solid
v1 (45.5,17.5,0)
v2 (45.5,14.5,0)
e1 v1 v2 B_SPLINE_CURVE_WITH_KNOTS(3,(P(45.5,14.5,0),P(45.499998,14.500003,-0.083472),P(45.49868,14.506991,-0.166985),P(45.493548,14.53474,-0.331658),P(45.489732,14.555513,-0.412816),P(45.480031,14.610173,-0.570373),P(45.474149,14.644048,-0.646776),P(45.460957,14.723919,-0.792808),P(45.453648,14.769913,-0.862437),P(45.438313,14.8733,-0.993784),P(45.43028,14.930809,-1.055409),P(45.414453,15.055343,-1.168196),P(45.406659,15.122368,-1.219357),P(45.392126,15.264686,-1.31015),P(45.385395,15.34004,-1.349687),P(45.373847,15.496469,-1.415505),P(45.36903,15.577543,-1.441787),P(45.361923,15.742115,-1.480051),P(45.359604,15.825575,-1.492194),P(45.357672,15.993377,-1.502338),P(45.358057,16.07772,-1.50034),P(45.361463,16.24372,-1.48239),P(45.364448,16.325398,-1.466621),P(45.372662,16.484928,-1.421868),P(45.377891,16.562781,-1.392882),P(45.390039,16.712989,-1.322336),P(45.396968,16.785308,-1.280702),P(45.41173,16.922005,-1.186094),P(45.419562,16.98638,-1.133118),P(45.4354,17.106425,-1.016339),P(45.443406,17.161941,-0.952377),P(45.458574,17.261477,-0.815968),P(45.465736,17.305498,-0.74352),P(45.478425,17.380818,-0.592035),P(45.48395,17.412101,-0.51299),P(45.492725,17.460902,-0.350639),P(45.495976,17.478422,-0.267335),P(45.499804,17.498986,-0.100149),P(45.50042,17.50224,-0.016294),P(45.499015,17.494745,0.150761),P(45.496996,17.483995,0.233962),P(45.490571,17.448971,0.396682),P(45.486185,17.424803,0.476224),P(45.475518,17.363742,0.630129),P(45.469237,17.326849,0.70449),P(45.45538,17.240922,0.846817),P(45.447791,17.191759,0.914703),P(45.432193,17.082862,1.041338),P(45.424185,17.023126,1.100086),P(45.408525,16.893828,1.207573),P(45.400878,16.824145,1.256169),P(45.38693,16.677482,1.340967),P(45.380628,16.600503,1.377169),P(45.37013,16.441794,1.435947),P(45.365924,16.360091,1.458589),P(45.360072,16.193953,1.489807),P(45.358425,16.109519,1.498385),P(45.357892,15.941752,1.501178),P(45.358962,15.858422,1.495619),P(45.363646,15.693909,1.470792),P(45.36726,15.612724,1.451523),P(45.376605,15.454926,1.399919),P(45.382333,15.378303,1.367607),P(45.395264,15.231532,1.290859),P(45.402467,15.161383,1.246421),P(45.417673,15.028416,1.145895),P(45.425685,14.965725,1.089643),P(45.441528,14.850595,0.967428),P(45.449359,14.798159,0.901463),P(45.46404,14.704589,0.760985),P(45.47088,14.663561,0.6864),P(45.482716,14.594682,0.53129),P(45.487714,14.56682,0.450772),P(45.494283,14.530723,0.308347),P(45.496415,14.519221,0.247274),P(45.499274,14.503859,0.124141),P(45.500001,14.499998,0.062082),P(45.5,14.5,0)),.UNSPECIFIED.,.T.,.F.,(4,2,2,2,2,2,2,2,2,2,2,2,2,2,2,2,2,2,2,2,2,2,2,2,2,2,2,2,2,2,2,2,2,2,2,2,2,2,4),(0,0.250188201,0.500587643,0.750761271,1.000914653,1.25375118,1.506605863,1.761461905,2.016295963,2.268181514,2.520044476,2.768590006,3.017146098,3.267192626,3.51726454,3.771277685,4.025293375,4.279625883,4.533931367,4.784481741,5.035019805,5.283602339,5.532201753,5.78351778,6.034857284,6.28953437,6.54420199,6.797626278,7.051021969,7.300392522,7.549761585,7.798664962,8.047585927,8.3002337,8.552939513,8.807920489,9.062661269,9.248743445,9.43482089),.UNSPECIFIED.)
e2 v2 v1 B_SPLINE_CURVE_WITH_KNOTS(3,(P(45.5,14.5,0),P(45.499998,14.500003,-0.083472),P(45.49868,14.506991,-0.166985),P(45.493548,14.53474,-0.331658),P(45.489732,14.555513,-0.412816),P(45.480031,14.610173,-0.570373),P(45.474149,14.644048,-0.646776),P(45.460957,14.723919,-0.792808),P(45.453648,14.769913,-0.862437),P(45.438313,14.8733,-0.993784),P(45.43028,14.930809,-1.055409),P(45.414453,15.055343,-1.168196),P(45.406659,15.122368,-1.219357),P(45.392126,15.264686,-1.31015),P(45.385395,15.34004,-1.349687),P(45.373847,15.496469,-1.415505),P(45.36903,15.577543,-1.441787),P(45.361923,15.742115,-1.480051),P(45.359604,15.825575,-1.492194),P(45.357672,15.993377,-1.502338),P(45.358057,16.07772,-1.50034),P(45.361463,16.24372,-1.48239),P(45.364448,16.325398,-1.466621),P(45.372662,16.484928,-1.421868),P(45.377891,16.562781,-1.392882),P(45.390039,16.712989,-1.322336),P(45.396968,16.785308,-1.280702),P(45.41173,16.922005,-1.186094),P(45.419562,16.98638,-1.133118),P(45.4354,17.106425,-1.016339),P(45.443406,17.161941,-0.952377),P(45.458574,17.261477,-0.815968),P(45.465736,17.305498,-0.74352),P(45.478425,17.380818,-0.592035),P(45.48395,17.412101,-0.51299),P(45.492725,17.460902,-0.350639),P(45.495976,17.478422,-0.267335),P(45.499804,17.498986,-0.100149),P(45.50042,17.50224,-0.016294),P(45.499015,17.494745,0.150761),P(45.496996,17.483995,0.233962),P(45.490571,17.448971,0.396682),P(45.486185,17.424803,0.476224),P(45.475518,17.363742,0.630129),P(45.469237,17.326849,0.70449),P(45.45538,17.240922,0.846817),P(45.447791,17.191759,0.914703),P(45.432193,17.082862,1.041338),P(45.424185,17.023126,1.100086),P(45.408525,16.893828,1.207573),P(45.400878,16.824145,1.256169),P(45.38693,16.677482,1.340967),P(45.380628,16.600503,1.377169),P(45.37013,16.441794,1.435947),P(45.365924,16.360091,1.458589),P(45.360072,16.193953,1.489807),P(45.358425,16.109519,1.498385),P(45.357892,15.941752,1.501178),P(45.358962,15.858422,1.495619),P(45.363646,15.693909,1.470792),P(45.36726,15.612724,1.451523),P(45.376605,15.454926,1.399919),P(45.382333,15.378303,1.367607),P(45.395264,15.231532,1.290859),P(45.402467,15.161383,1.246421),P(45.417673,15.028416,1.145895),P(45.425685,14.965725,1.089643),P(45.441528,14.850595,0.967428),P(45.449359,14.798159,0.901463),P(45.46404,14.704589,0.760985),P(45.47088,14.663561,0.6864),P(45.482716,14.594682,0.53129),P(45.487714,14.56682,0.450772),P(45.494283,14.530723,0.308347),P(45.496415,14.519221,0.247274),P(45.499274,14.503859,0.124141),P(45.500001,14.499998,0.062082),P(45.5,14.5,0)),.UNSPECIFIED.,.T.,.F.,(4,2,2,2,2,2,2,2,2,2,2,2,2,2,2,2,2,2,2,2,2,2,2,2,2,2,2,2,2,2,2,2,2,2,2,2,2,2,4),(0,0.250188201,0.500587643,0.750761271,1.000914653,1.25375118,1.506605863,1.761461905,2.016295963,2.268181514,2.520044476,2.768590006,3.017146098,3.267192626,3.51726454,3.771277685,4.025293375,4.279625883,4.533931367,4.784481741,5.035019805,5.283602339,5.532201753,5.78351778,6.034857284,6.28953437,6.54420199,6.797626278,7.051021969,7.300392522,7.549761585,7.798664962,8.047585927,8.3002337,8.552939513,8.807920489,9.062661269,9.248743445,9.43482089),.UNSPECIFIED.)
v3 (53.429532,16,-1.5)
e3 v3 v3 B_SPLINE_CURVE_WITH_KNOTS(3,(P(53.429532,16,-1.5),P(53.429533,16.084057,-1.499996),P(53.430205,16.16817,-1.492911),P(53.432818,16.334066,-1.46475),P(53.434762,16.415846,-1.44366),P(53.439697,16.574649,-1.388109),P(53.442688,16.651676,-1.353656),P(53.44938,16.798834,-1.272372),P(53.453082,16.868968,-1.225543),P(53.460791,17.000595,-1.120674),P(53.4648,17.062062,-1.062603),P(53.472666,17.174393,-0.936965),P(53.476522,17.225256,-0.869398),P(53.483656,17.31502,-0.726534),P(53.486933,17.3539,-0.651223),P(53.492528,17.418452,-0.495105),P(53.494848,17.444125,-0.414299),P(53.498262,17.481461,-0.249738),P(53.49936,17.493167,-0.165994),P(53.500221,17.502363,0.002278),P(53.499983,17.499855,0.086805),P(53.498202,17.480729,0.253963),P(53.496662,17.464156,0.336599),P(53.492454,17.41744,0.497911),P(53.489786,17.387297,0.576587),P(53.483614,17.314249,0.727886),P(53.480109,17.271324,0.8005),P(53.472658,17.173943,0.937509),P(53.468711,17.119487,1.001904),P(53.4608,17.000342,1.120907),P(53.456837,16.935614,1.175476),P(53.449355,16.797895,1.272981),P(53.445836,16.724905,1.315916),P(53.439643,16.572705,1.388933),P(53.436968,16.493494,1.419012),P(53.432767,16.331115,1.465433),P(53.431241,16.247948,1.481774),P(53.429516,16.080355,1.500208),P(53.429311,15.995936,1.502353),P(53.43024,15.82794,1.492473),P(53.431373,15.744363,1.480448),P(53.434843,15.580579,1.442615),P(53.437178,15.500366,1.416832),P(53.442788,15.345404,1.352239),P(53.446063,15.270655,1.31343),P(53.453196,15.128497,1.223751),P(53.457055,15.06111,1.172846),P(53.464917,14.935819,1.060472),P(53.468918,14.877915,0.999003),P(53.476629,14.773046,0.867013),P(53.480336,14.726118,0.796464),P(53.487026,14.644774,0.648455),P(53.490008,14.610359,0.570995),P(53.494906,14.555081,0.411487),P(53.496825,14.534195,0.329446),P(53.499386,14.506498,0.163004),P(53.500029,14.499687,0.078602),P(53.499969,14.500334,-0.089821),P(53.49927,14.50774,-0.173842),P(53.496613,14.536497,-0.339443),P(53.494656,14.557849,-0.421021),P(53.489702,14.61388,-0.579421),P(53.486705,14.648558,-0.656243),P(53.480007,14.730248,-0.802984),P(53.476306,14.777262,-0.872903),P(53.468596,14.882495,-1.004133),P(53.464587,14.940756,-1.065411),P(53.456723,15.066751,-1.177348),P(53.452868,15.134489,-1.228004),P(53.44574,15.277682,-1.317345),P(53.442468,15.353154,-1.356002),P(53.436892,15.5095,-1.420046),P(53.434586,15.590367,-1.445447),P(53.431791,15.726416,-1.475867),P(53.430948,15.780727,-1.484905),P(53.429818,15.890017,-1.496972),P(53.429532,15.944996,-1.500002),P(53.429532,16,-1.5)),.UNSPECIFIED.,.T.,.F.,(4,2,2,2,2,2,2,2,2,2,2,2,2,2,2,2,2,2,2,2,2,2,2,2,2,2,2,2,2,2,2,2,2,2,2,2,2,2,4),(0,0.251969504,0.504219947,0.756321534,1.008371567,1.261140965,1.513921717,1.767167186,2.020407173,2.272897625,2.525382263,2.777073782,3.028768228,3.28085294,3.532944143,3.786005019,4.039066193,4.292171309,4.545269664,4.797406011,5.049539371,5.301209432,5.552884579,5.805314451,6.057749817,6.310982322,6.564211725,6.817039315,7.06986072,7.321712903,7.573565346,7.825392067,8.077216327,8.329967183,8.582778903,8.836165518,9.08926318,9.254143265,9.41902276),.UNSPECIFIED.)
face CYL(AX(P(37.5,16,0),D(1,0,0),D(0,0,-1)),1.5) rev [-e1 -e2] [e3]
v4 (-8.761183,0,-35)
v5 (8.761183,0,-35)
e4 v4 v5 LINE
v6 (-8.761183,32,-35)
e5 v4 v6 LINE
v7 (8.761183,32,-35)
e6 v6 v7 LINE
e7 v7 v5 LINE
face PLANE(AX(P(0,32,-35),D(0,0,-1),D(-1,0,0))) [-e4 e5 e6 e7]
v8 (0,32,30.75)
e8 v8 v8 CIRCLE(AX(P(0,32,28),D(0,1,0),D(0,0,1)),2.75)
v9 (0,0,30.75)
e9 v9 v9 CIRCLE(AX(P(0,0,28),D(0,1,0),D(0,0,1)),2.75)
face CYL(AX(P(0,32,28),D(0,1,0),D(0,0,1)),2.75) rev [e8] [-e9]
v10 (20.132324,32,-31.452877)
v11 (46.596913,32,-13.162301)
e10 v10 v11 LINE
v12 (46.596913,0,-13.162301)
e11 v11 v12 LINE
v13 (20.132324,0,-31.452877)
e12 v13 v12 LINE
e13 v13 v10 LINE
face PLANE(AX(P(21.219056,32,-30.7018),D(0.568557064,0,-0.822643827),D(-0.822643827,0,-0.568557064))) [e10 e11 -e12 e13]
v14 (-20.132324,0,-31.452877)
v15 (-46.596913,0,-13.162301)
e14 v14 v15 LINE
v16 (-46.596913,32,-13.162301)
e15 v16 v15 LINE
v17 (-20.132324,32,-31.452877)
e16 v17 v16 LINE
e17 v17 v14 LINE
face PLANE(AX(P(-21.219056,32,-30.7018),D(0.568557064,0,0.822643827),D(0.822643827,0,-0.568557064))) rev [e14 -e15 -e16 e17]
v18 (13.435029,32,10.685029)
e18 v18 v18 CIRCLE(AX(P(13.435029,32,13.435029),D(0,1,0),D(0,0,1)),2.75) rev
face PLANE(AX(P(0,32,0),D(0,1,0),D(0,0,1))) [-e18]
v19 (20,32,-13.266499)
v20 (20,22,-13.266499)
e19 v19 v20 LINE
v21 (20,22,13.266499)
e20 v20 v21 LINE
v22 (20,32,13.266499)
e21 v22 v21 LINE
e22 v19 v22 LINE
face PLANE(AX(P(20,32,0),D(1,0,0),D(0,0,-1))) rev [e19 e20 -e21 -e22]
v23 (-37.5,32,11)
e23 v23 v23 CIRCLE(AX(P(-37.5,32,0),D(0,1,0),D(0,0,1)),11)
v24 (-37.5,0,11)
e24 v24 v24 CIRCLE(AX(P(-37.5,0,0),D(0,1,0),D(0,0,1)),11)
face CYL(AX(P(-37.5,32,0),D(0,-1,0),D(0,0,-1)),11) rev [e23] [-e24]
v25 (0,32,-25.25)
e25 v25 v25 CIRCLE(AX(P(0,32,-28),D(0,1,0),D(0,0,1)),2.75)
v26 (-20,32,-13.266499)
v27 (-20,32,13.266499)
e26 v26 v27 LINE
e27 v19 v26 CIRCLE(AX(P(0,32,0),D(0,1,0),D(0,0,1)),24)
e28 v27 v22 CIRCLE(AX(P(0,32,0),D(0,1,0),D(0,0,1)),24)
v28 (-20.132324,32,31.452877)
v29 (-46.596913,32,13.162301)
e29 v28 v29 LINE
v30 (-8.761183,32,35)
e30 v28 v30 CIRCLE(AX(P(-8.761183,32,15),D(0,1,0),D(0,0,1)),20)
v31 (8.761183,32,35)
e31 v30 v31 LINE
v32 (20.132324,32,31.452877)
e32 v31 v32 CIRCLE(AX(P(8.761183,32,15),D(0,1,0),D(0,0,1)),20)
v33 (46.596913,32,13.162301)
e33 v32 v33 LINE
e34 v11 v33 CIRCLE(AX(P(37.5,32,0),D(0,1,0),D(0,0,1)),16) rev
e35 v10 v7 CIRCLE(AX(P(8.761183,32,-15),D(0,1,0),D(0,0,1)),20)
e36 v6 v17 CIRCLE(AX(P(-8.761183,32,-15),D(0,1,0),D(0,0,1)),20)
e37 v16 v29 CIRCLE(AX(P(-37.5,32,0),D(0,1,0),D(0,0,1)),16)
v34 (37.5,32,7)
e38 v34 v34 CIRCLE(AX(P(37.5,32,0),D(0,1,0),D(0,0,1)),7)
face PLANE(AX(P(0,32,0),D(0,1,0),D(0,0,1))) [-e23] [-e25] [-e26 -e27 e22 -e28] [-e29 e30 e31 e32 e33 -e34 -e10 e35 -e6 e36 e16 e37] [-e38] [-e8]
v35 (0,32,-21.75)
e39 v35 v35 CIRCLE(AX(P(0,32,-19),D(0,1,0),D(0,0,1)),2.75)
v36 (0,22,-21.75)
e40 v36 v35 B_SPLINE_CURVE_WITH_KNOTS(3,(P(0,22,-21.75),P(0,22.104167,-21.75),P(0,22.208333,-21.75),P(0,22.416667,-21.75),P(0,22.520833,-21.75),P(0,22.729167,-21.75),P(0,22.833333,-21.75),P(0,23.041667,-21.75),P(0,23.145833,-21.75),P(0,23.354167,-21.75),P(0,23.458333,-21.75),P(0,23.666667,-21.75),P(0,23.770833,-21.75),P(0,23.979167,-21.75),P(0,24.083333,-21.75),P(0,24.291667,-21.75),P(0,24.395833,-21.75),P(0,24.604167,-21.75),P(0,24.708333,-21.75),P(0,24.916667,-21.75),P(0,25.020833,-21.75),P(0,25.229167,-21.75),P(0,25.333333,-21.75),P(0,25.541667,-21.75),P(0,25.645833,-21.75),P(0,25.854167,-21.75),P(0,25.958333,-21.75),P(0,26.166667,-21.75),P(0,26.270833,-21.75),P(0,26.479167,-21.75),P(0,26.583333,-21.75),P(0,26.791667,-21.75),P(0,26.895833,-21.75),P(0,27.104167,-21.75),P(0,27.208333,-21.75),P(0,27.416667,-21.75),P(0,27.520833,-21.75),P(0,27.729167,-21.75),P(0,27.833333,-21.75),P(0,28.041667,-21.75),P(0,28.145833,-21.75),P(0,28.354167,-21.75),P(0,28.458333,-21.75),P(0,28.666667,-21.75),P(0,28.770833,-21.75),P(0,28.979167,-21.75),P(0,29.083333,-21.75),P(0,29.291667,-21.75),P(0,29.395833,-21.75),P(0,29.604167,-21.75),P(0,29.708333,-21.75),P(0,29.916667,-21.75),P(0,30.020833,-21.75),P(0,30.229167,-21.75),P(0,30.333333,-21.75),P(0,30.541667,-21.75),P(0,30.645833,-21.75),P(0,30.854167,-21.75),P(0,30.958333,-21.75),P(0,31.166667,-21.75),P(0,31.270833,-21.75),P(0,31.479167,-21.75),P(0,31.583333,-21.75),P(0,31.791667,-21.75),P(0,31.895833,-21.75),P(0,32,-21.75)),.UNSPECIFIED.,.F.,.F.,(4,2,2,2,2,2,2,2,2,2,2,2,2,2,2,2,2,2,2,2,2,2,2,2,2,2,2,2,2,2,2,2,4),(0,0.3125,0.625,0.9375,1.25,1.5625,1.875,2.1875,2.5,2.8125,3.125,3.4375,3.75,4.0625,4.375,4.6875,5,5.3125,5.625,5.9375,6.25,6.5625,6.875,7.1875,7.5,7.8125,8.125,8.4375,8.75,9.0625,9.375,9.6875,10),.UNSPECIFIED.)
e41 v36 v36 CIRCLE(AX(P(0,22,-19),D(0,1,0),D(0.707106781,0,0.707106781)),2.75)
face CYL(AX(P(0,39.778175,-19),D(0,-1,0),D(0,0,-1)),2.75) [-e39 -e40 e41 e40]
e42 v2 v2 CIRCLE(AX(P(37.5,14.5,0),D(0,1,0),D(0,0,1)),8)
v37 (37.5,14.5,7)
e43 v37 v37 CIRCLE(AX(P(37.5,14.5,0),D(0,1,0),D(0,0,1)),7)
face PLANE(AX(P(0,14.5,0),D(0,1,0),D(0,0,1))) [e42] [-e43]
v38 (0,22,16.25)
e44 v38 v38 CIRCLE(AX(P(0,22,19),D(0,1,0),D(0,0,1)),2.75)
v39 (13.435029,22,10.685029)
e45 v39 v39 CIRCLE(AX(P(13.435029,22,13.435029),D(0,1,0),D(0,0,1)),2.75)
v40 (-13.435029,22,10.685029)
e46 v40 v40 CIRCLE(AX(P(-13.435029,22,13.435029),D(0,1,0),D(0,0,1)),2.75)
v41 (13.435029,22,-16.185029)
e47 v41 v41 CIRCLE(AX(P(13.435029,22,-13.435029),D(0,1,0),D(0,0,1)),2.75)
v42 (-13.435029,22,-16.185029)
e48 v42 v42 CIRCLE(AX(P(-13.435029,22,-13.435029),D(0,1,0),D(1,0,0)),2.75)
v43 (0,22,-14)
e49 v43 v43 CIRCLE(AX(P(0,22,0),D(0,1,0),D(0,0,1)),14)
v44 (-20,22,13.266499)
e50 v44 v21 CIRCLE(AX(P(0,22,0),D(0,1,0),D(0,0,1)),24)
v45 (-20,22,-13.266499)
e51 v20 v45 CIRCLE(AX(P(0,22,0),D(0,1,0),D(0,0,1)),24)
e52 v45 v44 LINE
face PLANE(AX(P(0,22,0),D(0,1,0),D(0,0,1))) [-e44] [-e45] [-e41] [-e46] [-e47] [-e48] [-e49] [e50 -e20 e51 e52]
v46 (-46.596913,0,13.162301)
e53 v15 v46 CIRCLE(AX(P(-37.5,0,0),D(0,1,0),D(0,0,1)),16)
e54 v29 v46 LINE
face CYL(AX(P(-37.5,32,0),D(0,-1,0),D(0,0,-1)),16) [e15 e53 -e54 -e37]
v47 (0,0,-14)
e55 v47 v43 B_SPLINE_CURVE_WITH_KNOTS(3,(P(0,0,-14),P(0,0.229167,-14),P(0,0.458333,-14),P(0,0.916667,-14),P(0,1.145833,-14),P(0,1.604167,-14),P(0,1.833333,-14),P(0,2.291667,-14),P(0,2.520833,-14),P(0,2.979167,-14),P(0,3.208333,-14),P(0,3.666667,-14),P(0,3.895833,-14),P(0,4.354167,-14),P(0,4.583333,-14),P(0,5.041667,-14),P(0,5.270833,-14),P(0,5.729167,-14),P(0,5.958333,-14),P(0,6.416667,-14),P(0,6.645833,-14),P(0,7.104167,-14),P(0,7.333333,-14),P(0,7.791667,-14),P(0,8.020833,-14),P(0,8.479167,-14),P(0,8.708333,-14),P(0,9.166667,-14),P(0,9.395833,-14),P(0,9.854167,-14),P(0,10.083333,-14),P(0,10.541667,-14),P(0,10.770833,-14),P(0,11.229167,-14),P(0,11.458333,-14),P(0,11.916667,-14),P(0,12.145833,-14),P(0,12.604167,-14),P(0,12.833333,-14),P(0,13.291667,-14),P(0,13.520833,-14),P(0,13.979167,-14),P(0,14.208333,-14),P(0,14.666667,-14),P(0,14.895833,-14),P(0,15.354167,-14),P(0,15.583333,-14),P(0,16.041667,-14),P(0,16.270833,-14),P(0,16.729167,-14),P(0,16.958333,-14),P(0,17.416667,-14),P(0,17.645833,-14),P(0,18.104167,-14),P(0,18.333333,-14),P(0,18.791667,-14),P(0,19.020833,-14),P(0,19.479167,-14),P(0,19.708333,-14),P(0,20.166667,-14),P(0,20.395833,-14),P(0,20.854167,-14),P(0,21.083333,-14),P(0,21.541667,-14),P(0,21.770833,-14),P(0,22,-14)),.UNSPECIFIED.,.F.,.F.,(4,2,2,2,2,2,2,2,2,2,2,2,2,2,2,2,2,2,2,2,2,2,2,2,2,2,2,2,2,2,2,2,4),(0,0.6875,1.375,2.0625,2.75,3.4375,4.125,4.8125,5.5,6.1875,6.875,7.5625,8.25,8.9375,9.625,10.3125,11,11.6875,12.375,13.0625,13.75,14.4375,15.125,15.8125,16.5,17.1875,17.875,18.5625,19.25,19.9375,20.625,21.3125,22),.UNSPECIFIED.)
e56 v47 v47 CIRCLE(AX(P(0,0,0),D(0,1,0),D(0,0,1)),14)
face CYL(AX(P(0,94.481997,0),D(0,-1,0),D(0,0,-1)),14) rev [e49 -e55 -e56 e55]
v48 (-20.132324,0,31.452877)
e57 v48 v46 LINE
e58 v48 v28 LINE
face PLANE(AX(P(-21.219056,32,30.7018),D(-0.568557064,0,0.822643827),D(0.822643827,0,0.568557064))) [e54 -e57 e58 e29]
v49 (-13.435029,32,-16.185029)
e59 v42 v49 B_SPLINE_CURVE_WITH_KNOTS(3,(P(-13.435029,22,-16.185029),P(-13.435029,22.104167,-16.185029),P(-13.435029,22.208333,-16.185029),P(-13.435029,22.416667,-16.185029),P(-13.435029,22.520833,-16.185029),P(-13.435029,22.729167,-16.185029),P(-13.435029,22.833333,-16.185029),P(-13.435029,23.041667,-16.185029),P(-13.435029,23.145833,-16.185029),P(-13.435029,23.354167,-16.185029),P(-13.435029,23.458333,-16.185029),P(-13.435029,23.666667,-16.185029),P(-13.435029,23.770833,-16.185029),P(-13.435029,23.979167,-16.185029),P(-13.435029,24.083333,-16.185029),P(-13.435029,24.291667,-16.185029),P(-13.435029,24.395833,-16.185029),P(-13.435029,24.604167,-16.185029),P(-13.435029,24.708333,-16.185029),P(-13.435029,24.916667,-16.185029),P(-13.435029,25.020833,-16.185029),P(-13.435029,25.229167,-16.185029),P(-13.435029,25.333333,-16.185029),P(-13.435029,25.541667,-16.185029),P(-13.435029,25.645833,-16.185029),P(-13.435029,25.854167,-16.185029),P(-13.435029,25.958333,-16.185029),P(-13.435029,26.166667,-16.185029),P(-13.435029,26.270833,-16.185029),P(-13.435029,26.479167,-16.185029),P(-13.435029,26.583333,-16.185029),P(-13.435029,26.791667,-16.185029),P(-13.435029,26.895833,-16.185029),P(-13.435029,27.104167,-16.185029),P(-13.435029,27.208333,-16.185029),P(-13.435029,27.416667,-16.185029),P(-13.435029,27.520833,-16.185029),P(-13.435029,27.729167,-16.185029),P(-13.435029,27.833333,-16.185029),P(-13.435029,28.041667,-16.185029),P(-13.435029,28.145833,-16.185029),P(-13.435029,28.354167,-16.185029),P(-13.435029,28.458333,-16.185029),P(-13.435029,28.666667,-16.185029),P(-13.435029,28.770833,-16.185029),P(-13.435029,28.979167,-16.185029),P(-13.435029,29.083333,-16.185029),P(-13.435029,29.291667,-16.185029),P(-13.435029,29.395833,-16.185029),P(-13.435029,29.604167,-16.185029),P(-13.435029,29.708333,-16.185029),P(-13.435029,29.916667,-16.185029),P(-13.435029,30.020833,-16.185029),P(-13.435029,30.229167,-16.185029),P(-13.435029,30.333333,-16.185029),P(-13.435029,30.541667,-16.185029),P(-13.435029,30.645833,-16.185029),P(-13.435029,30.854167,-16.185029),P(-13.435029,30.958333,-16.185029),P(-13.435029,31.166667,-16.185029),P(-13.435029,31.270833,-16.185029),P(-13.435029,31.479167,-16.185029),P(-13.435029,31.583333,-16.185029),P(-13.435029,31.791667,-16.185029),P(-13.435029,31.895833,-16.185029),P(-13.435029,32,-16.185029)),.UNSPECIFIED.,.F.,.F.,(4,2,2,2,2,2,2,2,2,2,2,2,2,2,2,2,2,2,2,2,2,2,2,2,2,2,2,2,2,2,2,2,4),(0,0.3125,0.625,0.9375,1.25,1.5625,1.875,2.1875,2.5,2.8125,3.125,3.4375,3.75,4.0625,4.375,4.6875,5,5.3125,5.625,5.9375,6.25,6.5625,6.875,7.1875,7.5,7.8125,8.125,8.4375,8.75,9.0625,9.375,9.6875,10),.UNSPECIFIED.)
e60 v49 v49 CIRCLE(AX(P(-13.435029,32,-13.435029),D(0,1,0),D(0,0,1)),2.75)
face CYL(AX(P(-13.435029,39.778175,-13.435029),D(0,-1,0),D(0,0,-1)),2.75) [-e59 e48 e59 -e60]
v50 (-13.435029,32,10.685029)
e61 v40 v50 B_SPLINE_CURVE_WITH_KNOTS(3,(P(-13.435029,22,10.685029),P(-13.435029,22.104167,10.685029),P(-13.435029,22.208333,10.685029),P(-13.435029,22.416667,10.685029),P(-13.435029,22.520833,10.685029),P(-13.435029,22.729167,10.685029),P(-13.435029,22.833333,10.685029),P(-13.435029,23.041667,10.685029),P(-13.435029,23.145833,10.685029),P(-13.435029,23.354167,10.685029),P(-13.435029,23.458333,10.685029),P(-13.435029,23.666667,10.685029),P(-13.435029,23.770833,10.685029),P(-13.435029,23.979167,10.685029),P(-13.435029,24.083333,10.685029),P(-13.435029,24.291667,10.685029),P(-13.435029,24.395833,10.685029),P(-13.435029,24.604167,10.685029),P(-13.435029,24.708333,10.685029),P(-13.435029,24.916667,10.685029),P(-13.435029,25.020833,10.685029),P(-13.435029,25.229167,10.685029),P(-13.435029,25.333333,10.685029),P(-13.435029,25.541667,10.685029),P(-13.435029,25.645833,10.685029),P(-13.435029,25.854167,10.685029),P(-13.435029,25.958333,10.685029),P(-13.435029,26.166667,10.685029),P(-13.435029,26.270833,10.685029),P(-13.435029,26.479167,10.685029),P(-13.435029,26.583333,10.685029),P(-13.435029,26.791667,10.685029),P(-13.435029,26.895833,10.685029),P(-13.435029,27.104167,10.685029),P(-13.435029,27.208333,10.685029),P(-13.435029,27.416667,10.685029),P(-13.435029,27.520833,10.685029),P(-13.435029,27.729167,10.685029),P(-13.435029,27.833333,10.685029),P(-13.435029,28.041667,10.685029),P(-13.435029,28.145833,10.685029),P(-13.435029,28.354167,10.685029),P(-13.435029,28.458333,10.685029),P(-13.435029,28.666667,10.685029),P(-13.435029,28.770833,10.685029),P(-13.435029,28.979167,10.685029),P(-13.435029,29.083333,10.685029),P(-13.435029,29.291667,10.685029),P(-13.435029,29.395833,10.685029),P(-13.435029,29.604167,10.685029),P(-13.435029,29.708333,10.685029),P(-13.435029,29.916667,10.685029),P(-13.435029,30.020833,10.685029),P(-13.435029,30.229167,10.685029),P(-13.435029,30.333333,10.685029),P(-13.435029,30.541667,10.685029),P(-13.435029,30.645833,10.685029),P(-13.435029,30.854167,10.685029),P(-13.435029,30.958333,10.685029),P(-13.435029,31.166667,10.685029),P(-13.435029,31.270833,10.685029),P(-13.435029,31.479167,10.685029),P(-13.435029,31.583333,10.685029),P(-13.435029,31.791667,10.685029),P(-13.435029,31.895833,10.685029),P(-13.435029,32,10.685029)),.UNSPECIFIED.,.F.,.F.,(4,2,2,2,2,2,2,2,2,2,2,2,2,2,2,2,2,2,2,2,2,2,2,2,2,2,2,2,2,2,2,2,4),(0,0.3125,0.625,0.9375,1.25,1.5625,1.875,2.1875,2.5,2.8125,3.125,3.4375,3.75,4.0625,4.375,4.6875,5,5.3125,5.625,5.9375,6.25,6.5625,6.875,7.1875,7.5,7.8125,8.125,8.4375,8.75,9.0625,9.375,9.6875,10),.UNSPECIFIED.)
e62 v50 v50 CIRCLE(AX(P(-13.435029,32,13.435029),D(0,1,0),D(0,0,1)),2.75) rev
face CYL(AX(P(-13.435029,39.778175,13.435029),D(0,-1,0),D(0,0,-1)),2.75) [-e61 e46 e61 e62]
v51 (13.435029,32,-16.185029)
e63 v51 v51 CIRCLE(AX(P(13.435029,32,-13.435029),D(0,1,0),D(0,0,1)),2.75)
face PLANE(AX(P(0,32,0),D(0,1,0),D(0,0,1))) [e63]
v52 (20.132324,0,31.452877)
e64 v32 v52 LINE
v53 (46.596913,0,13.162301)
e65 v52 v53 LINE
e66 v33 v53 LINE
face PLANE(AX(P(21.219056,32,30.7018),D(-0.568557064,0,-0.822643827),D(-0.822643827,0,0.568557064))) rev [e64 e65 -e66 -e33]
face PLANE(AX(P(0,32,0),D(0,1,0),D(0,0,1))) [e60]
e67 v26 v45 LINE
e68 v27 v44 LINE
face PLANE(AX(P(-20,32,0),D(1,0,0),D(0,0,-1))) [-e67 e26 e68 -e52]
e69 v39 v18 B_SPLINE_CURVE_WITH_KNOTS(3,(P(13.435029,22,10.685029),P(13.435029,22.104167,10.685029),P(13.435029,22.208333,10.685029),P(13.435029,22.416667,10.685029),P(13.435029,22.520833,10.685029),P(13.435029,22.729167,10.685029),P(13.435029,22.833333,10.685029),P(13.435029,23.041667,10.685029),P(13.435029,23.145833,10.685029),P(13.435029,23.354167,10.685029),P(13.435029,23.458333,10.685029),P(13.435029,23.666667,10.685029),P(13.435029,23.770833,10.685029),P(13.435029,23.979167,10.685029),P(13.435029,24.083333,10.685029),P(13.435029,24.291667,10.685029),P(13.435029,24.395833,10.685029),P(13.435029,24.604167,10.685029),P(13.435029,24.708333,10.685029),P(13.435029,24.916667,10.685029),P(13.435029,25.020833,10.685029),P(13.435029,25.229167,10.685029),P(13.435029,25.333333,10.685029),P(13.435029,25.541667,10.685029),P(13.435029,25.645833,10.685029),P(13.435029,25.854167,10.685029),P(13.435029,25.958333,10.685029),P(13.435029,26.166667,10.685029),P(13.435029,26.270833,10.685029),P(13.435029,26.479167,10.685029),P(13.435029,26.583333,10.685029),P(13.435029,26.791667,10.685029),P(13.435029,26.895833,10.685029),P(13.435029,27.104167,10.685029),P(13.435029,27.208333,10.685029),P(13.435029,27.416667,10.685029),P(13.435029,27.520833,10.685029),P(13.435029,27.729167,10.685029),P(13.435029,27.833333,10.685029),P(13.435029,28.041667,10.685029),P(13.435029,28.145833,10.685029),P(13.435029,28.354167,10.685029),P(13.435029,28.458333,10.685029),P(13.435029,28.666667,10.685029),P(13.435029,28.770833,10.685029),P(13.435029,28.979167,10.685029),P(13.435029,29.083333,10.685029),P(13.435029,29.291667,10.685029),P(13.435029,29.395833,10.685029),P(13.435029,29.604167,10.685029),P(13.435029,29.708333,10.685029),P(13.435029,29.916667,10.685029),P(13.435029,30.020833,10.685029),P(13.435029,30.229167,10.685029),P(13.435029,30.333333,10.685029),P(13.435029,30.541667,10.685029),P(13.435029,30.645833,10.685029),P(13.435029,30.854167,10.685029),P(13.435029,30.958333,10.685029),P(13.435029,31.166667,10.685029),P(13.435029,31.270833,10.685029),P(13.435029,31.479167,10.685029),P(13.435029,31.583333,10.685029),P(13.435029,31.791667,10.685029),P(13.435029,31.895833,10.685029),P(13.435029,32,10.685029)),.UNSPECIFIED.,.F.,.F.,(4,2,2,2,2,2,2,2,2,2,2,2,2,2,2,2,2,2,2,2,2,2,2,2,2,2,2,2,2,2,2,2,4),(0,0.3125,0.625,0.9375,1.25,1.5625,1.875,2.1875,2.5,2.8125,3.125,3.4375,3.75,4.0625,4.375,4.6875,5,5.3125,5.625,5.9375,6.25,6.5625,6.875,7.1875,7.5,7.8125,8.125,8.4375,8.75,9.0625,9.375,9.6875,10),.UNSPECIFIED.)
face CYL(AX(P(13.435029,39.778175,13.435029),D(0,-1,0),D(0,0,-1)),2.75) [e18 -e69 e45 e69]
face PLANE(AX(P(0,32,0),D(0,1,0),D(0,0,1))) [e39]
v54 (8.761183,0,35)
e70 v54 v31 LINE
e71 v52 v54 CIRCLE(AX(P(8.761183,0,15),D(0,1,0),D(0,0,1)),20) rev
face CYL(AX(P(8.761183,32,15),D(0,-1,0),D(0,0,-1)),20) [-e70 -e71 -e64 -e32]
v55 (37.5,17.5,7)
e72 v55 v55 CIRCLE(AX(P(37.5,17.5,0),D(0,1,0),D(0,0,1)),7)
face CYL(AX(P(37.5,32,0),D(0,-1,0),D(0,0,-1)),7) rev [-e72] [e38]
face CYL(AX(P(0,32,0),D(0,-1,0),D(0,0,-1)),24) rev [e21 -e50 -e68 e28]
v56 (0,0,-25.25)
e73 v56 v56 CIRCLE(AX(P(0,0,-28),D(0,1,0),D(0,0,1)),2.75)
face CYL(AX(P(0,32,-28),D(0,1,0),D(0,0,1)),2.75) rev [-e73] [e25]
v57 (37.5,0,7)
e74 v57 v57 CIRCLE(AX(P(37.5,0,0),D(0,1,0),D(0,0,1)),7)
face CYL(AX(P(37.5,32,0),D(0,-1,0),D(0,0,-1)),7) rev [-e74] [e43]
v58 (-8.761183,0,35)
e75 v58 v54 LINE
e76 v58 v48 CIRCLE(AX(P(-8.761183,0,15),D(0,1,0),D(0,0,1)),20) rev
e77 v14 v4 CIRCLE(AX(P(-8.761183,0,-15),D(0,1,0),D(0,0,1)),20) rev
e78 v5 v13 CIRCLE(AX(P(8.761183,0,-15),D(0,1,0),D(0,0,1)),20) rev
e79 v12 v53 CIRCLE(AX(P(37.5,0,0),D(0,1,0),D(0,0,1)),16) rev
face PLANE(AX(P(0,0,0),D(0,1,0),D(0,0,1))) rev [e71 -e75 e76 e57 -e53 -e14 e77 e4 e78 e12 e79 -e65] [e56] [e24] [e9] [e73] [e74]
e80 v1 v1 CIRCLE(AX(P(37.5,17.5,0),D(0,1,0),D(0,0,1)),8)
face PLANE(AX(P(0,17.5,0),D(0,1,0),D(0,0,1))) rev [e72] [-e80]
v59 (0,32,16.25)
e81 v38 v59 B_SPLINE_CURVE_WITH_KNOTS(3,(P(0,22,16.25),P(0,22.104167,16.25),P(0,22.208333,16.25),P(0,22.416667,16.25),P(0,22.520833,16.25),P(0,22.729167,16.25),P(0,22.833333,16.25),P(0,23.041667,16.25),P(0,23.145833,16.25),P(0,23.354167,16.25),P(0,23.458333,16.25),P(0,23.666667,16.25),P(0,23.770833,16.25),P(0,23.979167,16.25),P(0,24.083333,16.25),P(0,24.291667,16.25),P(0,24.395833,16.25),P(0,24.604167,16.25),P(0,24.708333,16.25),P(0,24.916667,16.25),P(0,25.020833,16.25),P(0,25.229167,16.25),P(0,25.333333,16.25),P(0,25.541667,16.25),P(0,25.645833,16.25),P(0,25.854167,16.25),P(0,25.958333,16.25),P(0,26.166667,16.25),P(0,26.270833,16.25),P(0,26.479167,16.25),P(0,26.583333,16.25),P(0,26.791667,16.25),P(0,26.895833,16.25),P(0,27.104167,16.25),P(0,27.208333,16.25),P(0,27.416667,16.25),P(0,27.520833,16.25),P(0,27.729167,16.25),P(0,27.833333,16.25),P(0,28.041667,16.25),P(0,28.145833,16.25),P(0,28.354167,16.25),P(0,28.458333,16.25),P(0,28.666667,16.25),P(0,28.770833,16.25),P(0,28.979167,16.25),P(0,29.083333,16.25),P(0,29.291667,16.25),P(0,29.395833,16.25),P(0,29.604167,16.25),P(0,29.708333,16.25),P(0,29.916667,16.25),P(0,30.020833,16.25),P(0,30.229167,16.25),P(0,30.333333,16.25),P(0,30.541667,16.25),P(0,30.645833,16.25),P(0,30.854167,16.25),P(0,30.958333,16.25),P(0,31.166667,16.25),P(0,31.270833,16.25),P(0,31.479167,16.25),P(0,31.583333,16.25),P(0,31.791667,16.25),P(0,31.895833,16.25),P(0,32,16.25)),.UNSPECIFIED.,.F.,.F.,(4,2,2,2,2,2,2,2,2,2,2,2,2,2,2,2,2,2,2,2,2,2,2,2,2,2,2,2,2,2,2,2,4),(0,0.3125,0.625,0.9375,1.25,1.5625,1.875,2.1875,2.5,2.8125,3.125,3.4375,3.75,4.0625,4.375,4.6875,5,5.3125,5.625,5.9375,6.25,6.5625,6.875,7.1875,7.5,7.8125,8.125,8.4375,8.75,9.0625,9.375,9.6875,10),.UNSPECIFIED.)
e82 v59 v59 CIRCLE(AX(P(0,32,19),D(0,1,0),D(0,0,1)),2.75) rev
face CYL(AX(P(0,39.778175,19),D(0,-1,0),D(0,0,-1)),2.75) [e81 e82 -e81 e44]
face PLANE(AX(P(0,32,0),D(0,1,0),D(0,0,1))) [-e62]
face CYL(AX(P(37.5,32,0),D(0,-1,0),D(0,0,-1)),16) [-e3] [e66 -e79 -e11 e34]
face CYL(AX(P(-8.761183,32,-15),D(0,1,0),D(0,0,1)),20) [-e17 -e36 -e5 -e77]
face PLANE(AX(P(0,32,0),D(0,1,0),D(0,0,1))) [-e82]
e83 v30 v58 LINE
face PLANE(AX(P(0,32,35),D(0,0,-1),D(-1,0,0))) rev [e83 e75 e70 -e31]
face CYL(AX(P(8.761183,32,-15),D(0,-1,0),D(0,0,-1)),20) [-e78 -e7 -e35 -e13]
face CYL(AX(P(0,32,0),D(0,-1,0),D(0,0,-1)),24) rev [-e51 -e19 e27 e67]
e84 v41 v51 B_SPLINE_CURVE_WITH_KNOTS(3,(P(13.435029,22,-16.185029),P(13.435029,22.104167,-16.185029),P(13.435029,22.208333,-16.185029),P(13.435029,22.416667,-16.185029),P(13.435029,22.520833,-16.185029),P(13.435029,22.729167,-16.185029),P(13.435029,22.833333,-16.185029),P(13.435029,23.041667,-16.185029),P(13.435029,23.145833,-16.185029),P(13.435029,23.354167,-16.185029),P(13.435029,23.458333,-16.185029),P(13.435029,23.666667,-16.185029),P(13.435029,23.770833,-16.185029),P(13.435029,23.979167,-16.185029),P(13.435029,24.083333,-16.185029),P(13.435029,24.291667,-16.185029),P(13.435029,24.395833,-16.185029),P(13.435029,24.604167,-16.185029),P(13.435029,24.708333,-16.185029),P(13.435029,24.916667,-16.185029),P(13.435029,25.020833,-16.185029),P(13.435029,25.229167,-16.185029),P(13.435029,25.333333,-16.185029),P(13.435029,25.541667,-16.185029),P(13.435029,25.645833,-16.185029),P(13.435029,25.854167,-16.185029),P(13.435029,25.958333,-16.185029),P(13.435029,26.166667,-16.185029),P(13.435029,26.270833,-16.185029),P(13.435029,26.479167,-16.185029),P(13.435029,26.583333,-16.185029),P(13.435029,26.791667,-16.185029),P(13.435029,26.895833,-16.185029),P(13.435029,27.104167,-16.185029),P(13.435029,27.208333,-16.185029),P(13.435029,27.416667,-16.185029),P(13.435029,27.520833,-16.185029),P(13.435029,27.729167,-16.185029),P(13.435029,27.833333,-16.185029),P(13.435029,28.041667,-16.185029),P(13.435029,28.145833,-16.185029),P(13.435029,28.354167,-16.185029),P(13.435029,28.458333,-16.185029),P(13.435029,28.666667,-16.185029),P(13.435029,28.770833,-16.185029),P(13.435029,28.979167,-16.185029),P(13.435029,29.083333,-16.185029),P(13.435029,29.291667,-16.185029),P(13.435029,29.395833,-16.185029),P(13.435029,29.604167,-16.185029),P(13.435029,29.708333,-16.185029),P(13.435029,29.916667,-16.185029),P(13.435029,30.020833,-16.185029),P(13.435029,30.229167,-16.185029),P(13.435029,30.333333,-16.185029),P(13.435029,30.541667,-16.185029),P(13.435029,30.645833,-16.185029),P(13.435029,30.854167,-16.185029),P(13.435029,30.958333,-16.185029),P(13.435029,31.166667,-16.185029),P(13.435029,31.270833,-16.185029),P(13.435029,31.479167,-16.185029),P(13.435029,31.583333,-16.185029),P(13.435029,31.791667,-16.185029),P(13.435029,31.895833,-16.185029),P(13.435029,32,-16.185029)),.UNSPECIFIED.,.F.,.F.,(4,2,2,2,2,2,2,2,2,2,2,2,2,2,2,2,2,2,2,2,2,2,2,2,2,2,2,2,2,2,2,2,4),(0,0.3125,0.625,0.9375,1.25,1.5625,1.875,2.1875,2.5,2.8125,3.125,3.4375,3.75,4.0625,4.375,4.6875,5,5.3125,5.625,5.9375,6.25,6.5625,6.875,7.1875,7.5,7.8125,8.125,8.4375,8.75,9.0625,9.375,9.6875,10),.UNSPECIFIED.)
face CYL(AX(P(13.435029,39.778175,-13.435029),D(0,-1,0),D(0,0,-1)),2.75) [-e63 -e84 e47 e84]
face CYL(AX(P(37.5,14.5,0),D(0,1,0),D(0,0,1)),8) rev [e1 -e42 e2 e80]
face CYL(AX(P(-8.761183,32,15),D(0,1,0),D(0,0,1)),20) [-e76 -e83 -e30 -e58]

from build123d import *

# Parameters (mm, degrees)
SKETCH1_R               = 11
SKETCH1_R_2             = 7
EXTRUDE2_DEPTH          = 32
SKETCH_R                = 14
EXTRUDE3_DEPTH          = 22
FILLET1_R               = 20
SKETCH5_R               = 2.75
EXTRUDE5_DEPTH          = 10
CIRPATTERN1_COUNT       = 3
CIRPATTERN1_ANGLE       = 90
MIRROR1_COPY_1_SKETCH_R = 2.75
MIRROR1_COPY_1_DEPTH    = 10
MIRROR1_COPY_2_SKETCH_R = 2.75
MIRROR1_COPY_2_DEPTH    = 10
EXTRUDE10_START         = 14.5
EXTRUDE10_OUTLINE_R     = 8
EXTRUDE10_OUTLINE_R_2   = 7
EXTRUDE10_DEPTH         = 3
EXTRUDE11_START         = 45.358117006
EXTRUDE11_OUTLINE_R     = 1.5
EXTRUDE11_DEPTH         = 8.141882994
M5_CLEARANCE_HOLE1_D    = 5.5


# Read off the part's stored shape, not the designer's step: Extrude10, Extrude11
with BuildPart() as part:
    # Sketch1 → Extrude2 (new body)
    with BuildSketch(Plane(origin=(0, 0, 0), x_dir=(1, 0, 0), z_dir=(0, 1, 0))):
        with BuildLine():
            Line((-15, -35), (15, -35))
            Line((15, -35), (46.596913018, -13.162301226))
            ThreePointArc((46.596913018, -13.162301226), (53.5, 0), (46.596913018, 13.162301226))
            Line((46.596913018, 13.162301226), (15, 35))
            Line((15, 35), (-15, 35))
            Line((-15, 35), (-46.596913018, 13.162301226))
            ThreePointArc((-46.596913018, 13.162301226), (-53.5, 0), (-46.596913018, -13.162301226))
            Line((-46.596913018, -13.162301226), (-15, -35))
        make_face()
        with Locations(Location((-37.5, 0, 0), (0, 0, 270))):
            Circle(SKETCH1_R, mode=Mode.SUBTRACT)
        with Locations(Location((37.5, 0, 0), (0, 0, 270))):
            Circle(SKETCH1_R_2, mode=Mode.SUBTRACT)
        with BuildLine():
            Line((-20, 13.266499161), (-20, -13.266499161))
            ThreePointArc((-20, -13.266499161), (0, -24), (20, -13.266499161))
            Line((20, -13.266499161), (20, 13.266499161))
            ThreePointArc((20, 13.266499161), (0, 24), (-20, 13.266499161))
        make_face(mode=Mode.SUBTRACT)
    extrude(amount=EXTRUDE2_DEPTH)

    # Sketch → Extrude3 (add)
    with BuildSketch(Plane(origin=(0, 0, 0), x_dir=(1, 0, 0), z_dir=(0, 1, 0))):
        with BuildLine():
            Line((20, 13.266499161), (20, -13.266499161))
            ThreePointArc((20, -13.266499161), (0, -24), (-20, -13.266499161))
            Line((-20, -13.266499161), (-20, 13.266499161))
            ThreePointArc((-20, 13.266499161), (0, 24), (20, 13.266499161))
        make_face()
        with Locations(Location((0, 0, 0), (0, 0, 90))):
            Circle(SKETCH_R, mode=Mode.SUBTRACT)
    extrude(amount=EXTRUDE3_DEPTH)

    # Fillet1
    fillet1_edges = [part.edges().sort_by_distance(p)[0] for p in [
        (15, 16, 35),
        (-15, 16, 35),
        (-15, 16, -35),
        (15, 16, -35),
    ]]
    fillet(fillet1_edges, radius=FILLET1_R)

    # Sketch5 → Extrude5 (add)
    with BuildSketch(Plane(origin=(0, 22, 0), x_dir=(1, 0, 0), z_dir=(0, 1, 0))):
        with Locations(Location((13.435028843, 13.435028843, 0), (0, 0, 90))):
            Circle(SKETCH5_R)
    extrude5 = extrude(amount=EXTRUDE5_DEPTH)

    # CirPattern1: Extrude5 ×3 about axis
    cirpattern1_axis = Axis((0, 0, 0), (0, 1, 0))
    for i in range(1, CIRPATTERN1_COUNT):
        add(extrude5.rotate(cirpattern1_axis, i * CIRPATTERN1_ANGLE / (CIRPATTERN1_COUNT - 1)))

    # Mirror1: Extrude5 across plane
    add(extrude5.mirror(Plane.XY))

    # Mirror1 copy 1 sketch → Mirror1 copy 1 (add)
    with BuildSketch(Plane(origin=(0, 22, 0), x_dir=(0.7071067811865467, 0, 0.7071067811865483), z_dir=(0, 1, 0))):
        with Locations((13.435028843, -13.435028843)):
            Circle(MIRROR1_COPY_1_SKETCH_R)
    extrude(amount=MIRROR1_COPY_1_DEPTH)

    # Mirror1 copy 2 sketch → Mirror1 copy 2 (add)
    with BuildSketch(Plane.ZX.offset(22)):
        with Locations((13.435028843, -13.435028843)):
            Circle(MIRROR1_COPY_2_SKETCH_R)
    extrude(amount=MIRROR1_COPY_2_DEPTH)

    # Extrude10 outline → Extrude10 (cut)
    with BuildSketch(Plane(origin=(0, 0, 0), x_dir=(1, 0, 0), z_dir=(0, 1, 0)).offset(EXTRUDE10_START)):
        with Locations((37.5, 0)):
            Circle(EXTRUDE10_OUTLINE_R)
        with Locations((37.5, 0)):
            Circle(EXTRUDE10_OUTLINE_R_2, mode=Mode.SUBTRACT)
    extrude(amount=EXTRUDE10_DEPTH, mode=Mode.SUBTRACT)

    # Extrude11 outline → Extrude11 (cut)
    with BuildSketch(Plane.YZ.offset(EXTRUDE11_START)):
        with Locations((16, 0)):
            Circle(EXTRUDE11_OUTLINE_R)
    extrude(amount=EXTRUDE11_DEPTH, mode=Mode.SUBTRACT)

    # M5 Clearance Hole1 (through all)
    with Locations(Plane(origin=(0, 32, 0), x_dir=(1, 0, 0), z_dir=(0, 1, 0))):
        with Locations((0, 28), (0, -28)):
            Hole(M5_CLEARANCE_HOLE1_D / 2)


solid = part.part
